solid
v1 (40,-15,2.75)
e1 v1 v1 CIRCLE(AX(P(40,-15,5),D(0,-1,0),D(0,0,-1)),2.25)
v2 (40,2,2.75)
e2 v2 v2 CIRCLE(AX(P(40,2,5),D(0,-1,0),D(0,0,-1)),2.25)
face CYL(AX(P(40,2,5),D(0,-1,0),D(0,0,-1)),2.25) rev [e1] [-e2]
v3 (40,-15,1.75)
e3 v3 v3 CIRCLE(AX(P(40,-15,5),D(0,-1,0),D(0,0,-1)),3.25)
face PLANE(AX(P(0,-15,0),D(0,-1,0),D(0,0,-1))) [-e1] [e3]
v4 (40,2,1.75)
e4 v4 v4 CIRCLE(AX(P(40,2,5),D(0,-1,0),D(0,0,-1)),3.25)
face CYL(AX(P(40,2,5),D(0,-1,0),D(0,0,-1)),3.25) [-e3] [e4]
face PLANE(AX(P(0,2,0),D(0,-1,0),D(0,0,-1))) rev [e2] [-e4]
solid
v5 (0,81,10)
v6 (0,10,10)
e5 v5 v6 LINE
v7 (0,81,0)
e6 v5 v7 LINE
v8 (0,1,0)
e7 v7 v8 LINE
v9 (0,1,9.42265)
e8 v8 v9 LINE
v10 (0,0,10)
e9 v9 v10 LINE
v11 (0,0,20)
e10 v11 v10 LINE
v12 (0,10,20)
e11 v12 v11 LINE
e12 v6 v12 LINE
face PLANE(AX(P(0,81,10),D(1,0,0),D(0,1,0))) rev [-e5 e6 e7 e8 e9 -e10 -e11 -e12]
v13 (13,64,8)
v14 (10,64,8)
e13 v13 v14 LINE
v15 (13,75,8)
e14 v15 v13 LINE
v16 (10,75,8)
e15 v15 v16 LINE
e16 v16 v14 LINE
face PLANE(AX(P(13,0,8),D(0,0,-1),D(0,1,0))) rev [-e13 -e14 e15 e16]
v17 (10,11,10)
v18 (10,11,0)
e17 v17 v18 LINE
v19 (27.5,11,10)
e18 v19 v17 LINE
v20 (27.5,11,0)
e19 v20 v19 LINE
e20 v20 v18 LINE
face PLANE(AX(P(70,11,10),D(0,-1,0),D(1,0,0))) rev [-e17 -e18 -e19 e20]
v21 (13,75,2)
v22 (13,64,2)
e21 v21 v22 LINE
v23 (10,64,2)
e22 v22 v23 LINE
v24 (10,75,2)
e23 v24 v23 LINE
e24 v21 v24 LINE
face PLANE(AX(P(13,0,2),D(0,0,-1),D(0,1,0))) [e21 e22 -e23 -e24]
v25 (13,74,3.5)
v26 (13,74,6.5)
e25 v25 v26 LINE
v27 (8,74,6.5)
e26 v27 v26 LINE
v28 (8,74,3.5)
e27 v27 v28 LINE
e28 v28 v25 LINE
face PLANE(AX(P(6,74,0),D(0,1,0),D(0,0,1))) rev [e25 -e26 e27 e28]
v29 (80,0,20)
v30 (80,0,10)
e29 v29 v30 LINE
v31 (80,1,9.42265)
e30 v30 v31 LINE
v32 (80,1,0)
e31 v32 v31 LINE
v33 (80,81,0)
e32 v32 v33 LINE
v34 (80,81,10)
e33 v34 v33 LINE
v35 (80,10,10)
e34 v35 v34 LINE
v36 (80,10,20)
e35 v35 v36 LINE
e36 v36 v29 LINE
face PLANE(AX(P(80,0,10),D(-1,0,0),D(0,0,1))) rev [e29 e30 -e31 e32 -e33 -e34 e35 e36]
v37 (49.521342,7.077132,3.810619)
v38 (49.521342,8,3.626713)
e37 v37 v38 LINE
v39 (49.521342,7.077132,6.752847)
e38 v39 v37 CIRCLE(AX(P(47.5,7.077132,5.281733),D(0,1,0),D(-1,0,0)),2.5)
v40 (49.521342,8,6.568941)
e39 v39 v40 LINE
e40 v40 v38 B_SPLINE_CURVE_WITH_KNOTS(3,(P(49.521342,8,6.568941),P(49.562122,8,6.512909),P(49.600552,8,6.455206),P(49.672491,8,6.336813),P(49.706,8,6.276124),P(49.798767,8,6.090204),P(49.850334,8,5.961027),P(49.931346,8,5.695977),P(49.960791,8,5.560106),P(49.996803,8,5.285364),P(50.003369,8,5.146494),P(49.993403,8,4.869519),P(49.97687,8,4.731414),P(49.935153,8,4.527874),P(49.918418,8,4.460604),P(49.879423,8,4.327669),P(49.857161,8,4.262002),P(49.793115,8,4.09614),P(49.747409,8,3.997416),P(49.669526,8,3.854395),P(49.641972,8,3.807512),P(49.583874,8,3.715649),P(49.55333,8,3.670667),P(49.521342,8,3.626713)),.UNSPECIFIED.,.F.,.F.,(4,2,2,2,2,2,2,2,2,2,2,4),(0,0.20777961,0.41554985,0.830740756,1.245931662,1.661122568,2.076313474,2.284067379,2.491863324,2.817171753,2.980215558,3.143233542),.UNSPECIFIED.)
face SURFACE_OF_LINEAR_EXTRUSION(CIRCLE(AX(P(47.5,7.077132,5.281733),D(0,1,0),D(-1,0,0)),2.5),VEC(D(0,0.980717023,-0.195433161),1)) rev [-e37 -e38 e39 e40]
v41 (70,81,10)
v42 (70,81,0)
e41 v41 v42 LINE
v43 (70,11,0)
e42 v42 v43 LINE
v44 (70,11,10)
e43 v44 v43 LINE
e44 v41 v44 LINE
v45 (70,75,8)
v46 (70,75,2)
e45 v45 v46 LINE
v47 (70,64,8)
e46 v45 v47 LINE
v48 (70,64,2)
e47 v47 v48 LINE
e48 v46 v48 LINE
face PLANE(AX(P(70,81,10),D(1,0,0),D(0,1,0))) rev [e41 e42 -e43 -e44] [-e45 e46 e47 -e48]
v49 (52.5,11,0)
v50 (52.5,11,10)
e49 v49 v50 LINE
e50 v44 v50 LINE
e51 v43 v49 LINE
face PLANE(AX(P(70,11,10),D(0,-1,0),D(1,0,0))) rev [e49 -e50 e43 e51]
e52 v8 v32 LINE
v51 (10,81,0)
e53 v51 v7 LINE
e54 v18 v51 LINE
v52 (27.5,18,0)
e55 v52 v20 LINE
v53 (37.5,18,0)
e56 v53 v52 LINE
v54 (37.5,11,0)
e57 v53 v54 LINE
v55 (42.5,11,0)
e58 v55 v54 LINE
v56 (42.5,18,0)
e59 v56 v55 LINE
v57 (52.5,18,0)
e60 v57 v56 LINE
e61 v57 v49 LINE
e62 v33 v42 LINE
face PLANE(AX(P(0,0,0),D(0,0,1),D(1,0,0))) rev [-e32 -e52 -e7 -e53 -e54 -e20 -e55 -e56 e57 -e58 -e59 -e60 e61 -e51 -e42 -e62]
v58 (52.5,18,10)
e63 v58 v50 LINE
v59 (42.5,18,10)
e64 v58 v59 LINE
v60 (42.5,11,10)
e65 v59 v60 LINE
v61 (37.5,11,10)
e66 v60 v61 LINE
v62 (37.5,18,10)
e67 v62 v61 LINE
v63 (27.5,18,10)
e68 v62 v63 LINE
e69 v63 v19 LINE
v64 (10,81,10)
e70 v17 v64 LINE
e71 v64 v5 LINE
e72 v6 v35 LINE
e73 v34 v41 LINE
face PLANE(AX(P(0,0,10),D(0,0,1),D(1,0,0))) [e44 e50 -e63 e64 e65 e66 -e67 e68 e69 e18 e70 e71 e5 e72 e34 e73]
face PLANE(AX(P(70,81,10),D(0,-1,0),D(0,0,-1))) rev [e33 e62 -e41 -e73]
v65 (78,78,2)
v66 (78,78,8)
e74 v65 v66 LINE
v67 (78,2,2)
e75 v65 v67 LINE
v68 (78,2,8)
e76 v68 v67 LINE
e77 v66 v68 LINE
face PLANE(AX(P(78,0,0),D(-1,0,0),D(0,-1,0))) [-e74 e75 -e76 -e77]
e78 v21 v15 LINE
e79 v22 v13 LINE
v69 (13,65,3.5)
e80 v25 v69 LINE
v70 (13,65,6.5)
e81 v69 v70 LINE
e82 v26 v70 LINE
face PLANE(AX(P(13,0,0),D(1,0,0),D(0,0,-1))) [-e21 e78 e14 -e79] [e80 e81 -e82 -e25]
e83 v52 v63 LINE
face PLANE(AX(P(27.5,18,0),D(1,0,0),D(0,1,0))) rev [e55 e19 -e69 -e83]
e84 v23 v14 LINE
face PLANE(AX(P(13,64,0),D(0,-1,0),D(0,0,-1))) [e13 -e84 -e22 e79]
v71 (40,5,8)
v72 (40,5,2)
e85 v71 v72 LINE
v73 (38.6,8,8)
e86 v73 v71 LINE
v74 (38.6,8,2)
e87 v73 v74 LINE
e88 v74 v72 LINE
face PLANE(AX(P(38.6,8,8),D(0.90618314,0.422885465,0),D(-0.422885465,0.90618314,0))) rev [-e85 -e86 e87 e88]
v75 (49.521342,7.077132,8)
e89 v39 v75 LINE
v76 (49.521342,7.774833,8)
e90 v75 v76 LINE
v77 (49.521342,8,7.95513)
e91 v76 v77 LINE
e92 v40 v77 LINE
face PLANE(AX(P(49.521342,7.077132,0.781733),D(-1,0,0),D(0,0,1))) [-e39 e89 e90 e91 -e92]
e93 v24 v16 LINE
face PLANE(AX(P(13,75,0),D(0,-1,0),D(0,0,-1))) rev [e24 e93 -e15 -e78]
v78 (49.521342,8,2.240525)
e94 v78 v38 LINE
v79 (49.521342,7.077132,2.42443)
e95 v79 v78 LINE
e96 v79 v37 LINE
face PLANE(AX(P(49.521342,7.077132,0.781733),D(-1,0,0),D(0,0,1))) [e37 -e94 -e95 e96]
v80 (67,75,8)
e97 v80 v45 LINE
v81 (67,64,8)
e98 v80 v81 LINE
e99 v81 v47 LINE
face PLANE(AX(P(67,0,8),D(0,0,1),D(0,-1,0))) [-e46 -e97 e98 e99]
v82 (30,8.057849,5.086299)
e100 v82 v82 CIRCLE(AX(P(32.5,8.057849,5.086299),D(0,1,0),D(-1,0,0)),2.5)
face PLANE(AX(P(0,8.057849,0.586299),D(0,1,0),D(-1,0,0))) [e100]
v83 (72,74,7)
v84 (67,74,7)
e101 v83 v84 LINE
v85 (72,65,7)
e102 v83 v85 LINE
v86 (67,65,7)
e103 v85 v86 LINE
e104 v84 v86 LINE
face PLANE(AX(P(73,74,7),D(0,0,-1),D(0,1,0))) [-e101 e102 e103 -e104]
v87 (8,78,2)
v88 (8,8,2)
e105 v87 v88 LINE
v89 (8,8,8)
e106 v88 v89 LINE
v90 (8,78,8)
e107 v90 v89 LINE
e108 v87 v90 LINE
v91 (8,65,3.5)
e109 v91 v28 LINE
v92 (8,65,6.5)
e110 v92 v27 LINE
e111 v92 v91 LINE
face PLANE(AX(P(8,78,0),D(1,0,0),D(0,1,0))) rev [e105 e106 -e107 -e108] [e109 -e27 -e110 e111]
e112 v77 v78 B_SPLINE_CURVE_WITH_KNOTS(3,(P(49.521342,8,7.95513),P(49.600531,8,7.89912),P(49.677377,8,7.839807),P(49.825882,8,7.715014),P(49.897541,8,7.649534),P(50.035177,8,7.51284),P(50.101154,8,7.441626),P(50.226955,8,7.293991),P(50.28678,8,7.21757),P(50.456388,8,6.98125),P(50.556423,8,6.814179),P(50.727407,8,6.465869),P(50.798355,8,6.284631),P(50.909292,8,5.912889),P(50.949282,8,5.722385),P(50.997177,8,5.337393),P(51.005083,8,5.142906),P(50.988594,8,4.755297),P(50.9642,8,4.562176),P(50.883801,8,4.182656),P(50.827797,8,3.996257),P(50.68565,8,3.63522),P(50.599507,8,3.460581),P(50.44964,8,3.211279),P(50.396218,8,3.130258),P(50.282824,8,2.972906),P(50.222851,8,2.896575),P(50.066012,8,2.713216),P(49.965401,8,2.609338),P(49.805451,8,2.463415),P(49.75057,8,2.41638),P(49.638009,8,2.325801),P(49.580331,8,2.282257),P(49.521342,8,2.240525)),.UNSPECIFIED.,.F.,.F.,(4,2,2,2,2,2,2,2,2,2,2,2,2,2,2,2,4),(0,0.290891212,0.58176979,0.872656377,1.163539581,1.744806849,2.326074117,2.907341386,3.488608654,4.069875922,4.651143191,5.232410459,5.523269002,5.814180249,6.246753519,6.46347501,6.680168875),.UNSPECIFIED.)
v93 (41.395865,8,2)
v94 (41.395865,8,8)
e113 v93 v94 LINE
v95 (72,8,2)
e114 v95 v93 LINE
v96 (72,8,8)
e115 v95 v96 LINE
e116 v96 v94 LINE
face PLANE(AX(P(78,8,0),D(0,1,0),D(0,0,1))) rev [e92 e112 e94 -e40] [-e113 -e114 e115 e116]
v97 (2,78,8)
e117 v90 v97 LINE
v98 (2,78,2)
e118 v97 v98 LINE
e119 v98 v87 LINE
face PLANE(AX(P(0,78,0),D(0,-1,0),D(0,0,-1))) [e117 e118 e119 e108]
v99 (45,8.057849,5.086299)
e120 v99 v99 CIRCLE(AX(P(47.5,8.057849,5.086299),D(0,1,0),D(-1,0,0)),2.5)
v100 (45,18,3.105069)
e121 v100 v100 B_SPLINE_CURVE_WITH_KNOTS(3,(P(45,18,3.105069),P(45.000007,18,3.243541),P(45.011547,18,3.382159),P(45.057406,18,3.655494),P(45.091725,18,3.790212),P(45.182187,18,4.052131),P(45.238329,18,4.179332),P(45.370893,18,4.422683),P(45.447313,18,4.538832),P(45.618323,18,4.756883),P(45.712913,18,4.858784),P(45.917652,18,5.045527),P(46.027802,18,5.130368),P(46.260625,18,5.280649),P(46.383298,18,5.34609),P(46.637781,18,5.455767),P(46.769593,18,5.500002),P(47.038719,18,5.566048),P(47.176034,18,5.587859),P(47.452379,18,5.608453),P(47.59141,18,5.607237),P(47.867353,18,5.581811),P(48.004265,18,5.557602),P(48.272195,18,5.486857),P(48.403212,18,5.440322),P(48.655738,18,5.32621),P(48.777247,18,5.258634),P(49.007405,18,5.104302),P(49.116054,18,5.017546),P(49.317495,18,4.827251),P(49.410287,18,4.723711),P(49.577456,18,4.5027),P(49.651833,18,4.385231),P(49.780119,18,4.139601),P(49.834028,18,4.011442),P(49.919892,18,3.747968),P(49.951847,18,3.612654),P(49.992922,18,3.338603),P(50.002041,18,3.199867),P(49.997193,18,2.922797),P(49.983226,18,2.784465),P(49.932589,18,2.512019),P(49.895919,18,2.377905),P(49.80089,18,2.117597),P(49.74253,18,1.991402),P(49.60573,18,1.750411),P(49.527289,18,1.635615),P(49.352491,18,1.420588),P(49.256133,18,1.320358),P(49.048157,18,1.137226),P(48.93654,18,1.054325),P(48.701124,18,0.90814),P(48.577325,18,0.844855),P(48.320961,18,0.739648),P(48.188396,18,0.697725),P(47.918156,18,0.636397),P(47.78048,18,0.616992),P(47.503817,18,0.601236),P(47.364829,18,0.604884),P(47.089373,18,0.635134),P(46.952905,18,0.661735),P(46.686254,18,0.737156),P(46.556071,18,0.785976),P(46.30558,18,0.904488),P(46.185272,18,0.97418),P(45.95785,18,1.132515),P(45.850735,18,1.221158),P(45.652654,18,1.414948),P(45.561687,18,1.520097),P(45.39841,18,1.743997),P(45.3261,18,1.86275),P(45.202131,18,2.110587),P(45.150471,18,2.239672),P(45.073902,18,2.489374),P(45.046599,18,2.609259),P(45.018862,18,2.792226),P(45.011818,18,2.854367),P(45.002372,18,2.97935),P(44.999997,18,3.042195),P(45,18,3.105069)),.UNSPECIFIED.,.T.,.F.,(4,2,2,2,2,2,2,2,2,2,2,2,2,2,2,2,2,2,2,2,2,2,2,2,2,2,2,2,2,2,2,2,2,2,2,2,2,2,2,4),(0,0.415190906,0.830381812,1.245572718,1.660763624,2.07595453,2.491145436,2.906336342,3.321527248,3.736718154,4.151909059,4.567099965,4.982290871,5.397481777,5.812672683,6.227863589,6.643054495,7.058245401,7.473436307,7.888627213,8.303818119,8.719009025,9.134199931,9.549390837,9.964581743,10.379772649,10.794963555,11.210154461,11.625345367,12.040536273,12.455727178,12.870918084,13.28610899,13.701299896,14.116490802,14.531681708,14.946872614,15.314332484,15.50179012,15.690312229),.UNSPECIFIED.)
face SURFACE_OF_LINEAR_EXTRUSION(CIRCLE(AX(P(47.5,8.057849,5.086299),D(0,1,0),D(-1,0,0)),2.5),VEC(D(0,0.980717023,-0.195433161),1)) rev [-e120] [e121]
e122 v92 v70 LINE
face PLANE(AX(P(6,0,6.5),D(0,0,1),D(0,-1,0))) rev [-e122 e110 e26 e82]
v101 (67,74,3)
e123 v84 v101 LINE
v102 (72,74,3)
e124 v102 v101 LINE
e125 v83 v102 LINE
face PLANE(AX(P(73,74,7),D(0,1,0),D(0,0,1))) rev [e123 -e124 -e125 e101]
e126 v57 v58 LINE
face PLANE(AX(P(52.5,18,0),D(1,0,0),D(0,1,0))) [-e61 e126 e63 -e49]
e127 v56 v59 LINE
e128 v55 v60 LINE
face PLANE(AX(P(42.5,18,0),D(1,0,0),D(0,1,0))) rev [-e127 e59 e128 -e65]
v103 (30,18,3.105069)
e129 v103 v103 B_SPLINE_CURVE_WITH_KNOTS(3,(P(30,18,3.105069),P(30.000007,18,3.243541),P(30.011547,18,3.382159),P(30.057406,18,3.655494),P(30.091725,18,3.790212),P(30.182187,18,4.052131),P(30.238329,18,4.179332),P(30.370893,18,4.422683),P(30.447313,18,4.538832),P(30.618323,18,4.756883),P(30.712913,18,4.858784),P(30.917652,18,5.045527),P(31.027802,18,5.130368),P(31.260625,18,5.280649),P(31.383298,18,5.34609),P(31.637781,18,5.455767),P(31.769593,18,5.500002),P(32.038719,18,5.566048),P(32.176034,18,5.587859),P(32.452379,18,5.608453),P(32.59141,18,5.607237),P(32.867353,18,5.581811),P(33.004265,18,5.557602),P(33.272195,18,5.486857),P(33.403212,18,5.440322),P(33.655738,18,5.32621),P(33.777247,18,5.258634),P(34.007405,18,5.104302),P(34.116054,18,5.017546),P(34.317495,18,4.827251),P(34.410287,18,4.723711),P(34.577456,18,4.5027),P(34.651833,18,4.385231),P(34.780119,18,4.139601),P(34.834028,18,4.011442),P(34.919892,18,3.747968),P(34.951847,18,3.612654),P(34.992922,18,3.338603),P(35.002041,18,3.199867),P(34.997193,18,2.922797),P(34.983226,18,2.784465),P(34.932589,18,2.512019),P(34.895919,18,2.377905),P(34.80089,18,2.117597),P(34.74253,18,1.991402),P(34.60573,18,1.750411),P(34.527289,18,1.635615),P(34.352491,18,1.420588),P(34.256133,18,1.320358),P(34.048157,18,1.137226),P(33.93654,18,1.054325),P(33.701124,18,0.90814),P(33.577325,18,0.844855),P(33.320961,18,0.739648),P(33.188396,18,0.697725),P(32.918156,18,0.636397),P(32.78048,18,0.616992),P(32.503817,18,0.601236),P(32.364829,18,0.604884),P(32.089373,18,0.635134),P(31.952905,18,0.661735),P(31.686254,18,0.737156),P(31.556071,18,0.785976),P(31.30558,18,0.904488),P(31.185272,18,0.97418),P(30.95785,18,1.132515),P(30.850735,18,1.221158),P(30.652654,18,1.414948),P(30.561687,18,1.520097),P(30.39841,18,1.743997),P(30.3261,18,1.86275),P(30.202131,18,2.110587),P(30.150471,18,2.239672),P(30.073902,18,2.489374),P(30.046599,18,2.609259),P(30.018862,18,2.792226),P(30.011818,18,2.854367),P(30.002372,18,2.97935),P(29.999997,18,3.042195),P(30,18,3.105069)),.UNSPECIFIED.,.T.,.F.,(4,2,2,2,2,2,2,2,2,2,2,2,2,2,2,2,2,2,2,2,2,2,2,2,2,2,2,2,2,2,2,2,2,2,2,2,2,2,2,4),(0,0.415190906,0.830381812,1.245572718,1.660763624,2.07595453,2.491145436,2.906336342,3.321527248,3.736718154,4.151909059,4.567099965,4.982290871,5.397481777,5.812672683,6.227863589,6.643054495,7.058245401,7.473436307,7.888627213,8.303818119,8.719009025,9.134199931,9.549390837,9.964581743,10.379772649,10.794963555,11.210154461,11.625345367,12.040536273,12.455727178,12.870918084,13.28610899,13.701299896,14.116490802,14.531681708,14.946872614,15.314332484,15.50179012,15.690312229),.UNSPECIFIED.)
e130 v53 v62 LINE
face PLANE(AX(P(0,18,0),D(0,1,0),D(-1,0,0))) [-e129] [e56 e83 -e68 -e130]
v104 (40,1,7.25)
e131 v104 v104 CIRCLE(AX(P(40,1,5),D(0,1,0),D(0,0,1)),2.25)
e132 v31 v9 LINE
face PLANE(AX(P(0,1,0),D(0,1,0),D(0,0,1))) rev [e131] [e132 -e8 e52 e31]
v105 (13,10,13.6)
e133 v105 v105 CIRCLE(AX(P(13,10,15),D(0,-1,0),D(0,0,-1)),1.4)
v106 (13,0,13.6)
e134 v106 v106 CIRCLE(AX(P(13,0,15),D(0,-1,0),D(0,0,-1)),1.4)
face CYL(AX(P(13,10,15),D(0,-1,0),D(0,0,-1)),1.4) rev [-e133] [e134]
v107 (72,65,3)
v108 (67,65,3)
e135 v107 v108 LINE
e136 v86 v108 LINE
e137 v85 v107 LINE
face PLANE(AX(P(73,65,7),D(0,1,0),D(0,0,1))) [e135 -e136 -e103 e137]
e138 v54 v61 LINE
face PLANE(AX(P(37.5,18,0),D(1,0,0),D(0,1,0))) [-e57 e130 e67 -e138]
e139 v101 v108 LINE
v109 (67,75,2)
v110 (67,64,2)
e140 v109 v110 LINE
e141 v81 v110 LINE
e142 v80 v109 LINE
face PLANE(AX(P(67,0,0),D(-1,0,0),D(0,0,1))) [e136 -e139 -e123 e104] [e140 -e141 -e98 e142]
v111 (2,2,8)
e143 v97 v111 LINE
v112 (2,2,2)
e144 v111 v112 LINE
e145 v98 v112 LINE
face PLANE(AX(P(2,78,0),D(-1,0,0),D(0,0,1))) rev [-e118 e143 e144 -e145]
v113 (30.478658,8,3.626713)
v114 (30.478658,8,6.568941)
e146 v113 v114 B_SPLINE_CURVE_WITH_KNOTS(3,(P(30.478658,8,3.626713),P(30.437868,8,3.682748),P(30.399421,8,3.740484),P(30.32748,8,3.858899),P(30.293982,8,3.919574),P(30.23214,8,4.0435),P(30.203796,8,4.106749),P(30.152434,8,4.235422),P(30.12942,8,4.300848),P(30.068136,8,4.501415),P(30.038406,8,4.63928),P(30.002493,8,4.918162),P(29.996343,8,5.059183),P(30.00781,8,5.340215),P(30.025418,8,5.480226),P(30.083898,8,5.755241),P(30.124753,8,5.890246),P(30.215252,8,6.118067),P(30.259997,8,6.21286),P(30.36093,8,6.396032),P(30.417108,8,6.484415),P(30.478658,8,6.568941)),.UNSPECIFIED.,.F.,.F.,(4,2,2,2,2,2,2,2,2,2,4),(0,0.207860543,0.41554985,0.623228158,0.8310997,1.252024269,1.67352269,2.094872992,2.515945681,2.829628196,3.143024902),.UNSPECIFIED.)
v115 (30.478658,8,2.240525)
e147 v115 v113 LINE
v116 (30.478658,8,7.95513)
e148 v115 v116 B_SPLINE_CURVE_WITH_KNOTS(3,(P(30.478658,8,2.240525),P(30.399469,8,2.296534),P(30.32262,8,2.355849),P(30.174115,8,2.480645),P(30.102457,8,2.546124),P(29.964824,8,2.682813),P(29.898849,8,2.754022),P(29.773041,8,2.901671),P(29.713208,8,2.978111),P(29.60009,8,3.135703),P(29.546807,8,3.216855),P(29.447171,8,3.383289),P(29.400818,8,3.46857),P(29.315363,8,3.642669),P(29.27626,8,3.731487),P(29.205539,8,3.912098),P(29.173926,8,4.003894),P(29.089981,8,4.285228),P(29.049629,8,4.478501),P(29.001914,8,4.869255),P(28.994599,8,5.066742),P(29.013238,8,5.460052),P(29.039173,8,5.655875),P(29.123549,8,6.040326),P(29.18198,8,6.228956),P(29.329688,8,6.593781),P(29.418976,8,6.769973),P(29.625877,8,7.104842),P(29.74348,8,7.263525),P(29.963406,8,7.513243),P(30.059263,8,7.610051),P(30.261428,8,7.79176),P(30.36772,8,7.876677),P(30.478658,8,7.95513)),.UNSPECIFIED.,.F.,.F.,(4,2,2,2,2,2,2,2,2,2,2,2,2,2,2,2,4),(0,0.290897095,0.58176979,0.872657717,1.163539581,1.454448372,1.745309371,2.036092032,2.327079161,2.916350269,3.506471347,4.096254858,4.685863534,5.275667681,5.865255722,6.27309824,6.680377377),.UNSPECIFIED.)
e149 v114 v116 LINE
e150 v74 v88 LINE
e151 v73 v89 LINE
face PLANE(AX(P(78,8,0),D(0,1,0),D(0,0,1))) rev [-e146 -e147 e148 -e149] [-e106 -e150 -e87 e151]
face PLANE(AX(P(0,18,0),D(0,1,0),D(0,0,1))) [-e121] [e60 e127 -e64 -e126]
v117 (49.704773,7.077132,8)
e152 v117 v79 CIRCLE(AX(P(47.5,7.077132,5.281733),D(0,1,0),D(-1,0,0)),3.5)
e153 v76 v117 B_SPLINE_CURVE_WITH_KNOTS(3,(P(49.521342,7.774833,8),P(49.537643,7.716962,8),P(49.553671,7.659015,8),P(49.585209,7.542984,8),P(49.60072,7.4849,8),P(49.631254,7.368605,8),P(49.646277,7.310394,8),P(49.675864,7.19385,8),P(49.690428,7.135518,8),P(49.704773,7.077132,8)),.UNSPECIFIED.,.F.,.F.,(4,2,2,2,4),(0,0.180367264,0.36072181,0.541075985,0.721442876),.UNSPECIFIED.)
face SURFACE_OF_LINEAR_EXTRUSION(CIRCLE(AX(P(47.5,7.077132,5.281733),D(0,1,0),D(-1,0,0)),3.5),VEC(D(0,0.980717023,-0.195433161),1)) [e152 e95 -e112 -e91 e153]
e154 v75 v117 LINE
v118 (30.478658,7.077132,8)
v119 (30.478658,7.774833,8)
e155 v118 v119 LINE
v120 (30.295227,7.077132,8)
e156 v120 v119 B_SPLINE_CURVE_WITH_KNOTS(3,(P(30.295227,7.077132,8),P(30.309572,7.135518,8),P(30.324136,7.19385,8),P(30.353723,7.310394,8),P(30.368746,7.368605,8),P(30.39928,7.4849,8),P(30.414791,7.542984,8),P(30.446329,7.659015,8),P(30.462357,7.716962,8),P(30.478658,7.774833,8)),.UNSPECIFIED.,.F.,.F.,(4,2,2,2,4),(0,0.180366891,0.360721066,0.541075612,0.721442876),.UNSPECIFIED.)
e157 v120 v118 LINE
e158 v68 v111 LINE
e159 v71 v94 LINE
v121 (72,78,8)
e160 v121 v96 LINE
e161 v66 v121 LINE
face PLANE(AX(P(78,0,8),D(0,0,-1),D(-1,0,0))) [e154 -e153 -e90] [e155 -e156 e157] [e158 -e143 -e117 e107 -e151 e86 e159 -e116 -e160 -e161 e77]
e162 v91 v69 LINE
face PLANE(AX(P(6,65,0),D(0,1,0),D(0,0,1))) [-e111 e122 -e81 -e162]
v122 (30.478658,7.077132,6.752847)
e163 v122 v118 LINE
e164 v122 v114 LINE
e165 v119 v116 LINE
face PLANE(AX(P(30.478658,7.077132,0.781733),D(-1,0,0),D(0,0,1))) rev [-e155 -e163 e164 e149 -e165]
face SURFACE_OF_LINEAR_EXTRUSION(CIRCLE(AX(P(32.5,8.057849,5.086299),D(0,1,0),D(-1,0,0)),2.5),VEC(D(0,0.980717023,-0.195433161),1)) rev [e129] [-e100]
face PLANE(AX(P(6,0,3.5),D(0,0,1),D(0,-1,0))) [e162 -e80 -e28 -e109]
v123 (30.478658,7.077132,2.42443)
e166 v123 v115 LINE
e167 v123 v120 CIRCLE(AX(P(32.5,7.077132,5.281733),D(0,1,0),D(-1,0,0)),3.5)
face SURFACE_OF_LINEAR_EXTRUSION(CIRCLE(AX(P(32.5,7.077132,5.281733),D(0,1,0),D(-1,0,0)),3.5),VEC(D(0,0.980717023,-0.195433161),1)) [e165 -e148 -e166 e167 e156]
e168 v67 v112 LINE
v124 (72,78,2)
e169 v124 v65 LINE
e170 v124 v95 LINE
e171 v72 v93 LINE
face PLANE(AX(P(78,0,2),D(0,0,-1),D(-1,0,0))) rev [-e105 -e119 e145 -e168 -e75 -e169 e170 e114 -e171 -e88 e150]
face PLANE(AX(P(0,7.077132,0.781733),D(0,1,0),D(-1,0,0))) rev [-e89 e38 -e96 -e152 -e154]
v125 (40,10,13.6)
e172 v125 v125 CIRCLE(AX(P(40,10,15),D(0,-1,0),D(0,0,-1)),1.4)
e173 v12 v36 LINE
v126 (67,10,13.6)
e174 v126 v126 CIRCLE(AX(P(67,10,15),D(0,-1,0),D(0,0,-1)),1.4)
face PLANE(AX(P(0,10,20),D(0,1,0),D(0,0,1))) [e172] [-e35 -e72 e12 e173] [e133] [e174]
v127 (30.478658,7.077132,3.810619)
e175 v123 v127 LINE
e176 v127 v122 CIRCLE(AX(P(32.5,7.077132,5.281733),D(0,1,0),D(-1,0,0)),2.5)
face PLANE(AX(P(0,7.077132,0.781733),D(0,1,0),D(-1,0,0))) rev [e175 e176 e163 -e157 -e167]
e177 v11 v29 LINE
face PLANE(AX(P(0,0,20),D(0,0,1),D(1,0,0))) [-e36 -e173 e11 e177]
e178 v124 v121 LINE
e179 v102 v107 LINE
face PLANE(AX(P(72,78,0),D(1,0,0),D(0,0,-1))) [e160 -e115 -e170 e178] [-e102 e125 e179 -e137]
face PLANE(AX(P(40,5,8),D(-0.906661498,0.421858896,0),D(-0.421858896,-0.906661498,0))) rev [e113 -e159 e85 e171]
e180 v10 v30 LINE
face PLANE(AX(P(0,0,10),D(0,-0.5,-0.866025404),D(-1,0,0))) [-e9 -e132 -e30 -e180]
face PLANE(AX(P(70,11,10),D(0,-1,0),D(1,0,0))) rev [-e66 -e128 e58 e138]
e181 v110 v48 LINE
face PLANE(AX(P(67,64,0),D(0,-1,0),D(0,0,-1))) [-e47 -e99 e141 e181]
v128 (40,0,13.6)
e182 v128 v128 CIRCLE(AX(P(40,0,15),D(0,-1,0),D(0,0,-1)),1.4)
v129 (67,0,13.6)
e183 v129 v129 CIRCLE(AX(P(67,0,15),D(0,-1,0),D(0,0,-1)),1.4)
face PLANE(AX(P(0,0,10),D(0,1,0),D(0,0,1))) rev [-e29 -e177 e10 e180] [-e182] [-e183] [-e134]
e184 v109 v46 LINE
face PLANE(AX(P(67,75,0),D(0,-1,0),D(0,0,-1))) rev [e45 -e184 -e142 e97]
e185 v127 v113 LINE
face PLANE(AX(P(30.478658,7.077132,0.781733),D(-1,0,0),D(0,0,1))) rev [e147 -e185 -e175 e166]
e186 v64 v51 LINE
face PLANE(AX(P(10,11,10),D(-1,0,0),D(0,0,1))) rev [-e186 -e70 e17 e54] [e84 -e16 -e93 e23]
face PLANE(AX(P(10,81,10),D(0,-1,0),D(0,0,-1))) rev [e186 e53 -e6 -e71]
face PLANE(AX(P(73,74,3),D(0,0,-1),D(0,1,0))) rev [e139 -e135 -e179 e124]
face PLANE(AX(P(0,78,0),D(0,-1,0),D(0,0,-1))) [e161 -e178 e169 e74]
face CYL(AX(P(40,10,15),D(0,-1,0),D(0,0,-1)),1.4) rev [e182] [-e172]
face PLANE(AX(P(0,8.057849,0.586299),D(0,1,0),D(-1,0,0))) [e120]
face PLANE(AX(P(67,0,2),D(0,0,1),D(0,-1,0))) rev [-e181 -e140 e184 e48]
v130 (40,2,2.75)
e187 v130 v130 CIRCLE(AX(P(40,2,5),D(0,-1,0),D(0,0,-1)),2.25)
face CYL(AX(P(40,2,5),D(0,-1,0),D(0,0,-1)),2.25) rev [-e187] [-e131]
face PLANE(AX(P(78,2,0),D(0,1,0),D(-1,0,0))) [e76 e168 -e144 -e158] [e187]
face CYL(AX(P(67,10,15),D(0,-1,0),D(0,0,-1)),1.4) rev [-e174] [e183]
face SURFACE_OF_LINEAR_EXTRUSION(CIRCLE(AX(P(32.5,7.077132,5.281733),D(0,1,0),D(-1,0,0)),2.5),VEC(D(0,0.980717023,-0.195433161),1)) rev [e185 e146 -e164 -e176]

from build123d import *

# Parameters (mm, degrees)
BOSS_EXTRUDE1_DEPTH       = 10
SKETCH6_W                 = 4
SKETCH6_H                 = 9
CUT_EXTRUDE3_DEPTH        = 3
SKETCH6_3_W               = 6
SKETCH6_3_H               = 11
SKETCH6_3_W_2             = 4
SKETCH6_3_H_2             = 9
BOSS_EXTRUDE4_DEPTH       = 3
CUT_EXTRUDE4_START        = 65
CUT_EXTRUDE4_OUTLINE_W    = 4
CUT_EXTRUDE4_OUTLINE_H    = 3
CUT_EXTRUDE4_DEPTH        = 9
SKETCH5_3_W               = 6
SKETCH5_3_H               = 11
SKETCH5_3_W_2             = 3
SKETCH5_3_H_2             = 9
BOSS_EXTRUDE5_DEPTH       = 3
SKETCH8_W                 = 10
SKETCH8_H                 = 10
BOSS_EXTRUDE8_DEPTH       = 80
SKETCH9_R                 = 1.4
CUT_EXTRUDE6_DEPTH        = 10
SKETCH4_W                 = 10
SKETCH4_H                 = 10
BOSS_EXTRUDE11_DEPTH      = 7
SKETCH4_15_R              = 2.5
CUT_EXTRUDE8_DEPTH        = 8
CUT_EXTRUDE8_DEPTH_BACK   = 3
CUT_EXTRUDE11_DEPTH       = 78
SKETCH17_W                = 6
SKETCH17_H                = 6
CUT_EXTRUDE12_DEPTH       = 70
BOSS_EXTRUDE20_DEPTH      = 2
BOSS_EXTRUDE22_DEPTH      = 2
BOSS_EXTRUDE23_DEPTH      = 6
SKETCH22_W                = 10
SKETCH22_H                = 1
CUT_EXTRUDE15_DEPTH       = 80
CHAMFER3_SIZE2            = 0.577350269
CHAMFER3_SIZE             = 1
BOSS_EXTRUDE25_DEPTH      = 15
BOSS_EXTRUDE25_DEPTH_BACK = 2
CUT_EXTRUDE16_DEPTH       = 2
BOSS_EXTRUDE26_DEPTH      = 4


# Read off the part's stored shape, not the designer's step: Cut-Extrude4
with BuildPart() as part:
    # Sketch1 → Boss-Extrude1 (new body)
    with BuildSketch(Plane.XY):
        Polygon((0, 0), (80, 0), (80, 81), (70, 81), (70, 11), (10, 11), (10, 81), (0, 81), align=None)
    extrude(amount=BOSS_EXTRUDE1_DEPTH)

    # Sketch6 → Cut-Extrude3 (cut)
    with BuildSketch(Plane.ZY.offset(-70)):
        with Locations((5, 69.5)):
            Rectangle(SKETCH6_W, SKETCH6_H)
    extrude(amount=-CUT_EXTRUDE3_DEPTH, mode=Mode.SUBTRACT)

    # Sketch6<3> → Boss-Extrude4 (add)
    with BuildSketch(Plane.ZY.offset(-70)):
        with Locations((5, 69.5)):
            Rectangle(SKETCH6_3_W, SKETCH6_3_H)
        with Locations((5, 69.5)):
            Rectangle(SKETCH6_3_W_2, SKETCH6_3_H_2, mode=Mode.SUBTRACT)
    extrude(amount=BOSS_EXTRUDE4_DEPTH)

    # Cut-Extrude4 outline → Cut-Extrude4 (cut)
    with BuildSketch(Plane(origin=(0, 0, 0), x_dir=(1, 0, 0), z_dir=(0, 1, 0)).offset(CUT_EXTRUDE4_START)):
        with Locations((8, -5)):
            Rectangle(CUT_EXTRUDE4_OUTLINE_W, CUT_EXTRUDE4_OUTLINE_H)
    extrude(amount=CUT_EXTRUDE4_DEPTH, mode=Mode.SUBTRACT)

    # Sketch5<3> → Boss-Extrude5 (add)
    with BuildSketch(Plane(origin=(10, 0, 0), x_dir=(0, 0, -1), z_dir=(1, 0, 0))):
        with Locations((-5, 69.5)):
            Rectangle(SKETCH5_3_W, SKETCH5_3_H)
        with Locations((-5, 69.5)):
            Rectangle(SKETCH5_3_W_2, SKETCH5_3_H_2, mode=Mode.SUBTRACT)
    extrude(amount=BOSS_EXTRUDE5_DEPTH)

    # Sketch8 → Boss-Extrude8 (add)
    with BuildSketch(Plane(origin=(80, 0, 0), x_dir=(0, 0, -1), z_dir=(1, 0, 0))):
        with Locations((-15, 5)):
            Rectangle(SKETCH8_W, SKETCH8_H)
    extrude(amount=-BOSS_EXTRUDE8_DEPTH)

    # Sketch9 → Cut-Extrude6 (cut)
    with BuildSketch(Plane.XZ):
        with Locations(Location((40, 15, 0), (0, 0, 270))):
            Circle(SKETCH9_R)
        with Locations(Location((13, 15, 0), (0, 0, 270))):
            Circle(SKETCH9_R)
        with Locations(Location((67, 15, 0), (0, 0, 270))):
            Circle(SKETCH9_R)
    extrude(amount=-CUT_EXTRUDE6_DEPTH, mode=Mode.SUBTRACT)

    # Sketch4 → Boss-Extrude11 (add)
    with BuildSketch(Plane(origin=(0, 11, 0), x_dir=(1, 0, 0), z_dir=(0, 1, 0))):
        with Locations((32.5, -5)):
            Rectangle(SKETCH4_W, SKETCH4_H)
        with Locations((47.5, -5)):
            Rectangle(SKETCH4_W, SKETCH4_H)
    extrude(amount=BOSS_EXTRUDE11_DEPTH)

    # Sketch4<15> → Cut-Extrude8 (cut, two sides, along a direction that is not the sketch's normal)
    with BuildSketch(Plane(origin=(0, 11, 0), x_dir=(1, 0, 0), z_dir=(0, 1, 0))) as cut_extrude8_sk:
        with Locations((32.5, -4.5)):
            Circle(SKETCH4_15_R)
        with Locations((47.5, -4.5)):
            Circle(SKETCH4_15_R)
    extrude(amount=CUT_EXTRUDE8_DEPTH, dir=(0, 0.9807170231588296, -0.19543316117405435), mode=Mode.SUBTRACT)
    extrude(cut_extrude8_sk.sketch, amount=-CUT_EXTRUDE8_DEPTH_BACK, dir=(0, 0.9807170231588296, -0.19543316117405435), mode=Mode.SUBTRACT)

    # Sketch2 → Cut-Extrude11 (cut)
    with BuildSketch(Plane.ZY):
        with BuildLine():
            Line((8, 8), (5, 8))
            ThreePointArc((5, 8), (7.121320344, 7.121320344), (8, 5))
            Line((8, 5), (8, 8))
        make_face()
        with BuildLine():
            Line((8, 2), (8, 5))
            ThreePointArc((8, 5), (7.121320344, 2.878679656), (5, 2))
            Line((5, 2), (8, 2))
        make_face()
        with BuildLine():
            ThreePointArc((5, 2), (2.878679656, 2.878679656), (2, 5))
            Line((2, 5), (2, 2))
            Line((2, 2), (5, 2))
        make_face()
        with BuildLine():
            ThreePointArc((2, 5), (2.878679656, 7.121320344), (5, 8))
            Line((5, 8), (2, 8))
            Line((2, 8), (2, 5))
        make_face()
        with BuildLine():
            ThreePointArc((8, 5), (7.121320344, 7.121320344), (5, 8))
            Line((5, 8), (5, 7))
            ThreePointArc((5, 7), (6.414213562, 6.414213562), (7, 5))
            ThreePointArc((7, 5), (6.414213562, 3.585786438), (5, 3))
            Line((5, 3), (5, 2))
            ThreePointArc((5, 2), (7.121320344, 2.878679656), (8, 5))
        make_face()
        with BuildLine():
            Line((5, 7), (5, 8))
            ThreePointArc((5, 8), (2.878679656, 7.121320344), (2, 5))
            ThreePointArc((2, 5), (2.878679656, 2.878679656), (5, 2))
            Line((5, 2), (5, 3))
            ThreePointArc((5, 3), (3, 5), (5, 7))
        make_face()
        with BuildLine():
            ThreePointArc((7, 5), (6.414213562, 6.414213562), (5, 7))
            Line((5, 7), (5, 3))
            ThreePointArc((5, 3), (6.414213562, 3.585786438), (7, 5))
        make_face()
        with BuildLine():
            Line((5, 3), (5, 7))
            ThreePointArc((5, 7), (3, 5), (5, 3))
        make_face()
    extrude(amount=-CUT_EXTRUDE11_DEPTH, mode=Mode.SUBTRACT)

    # Sketch17 → Cut-Extrude12 (cut)
    with BuildSketch(Plane.XZ.offset(-8)):
        with Locations((5, 5)):
            Rectangle(SKETCH17_W, SKETCH17_H)
        with Locations((75, 5)):
            Rectangle(SKETCH17_W, SKETCH17_H)
    extrude(amount=-CUT_EXTRUDE12_DEPTH, mode=Mode.SUBTRACT)

    # Sketch2<17> → Boss-Extrude20 (add)
    with BuildSketch(Plane.ZY):
        with BuildLine():
            ThreePointArc((2, 5), (2.878679656, 7.121320344), (5, 8))
            Line((5, 8), (2, 8))
            Line((2, 8), (2, 5))
        make_face()
        with BuildLine():
            Line((8, 8), (5, 8))
            ThreePointArc((5, 8), (7.121320344, 7.121320344), (8, 5))
            Line((8, 5), (8, 8))
        make_face()
        with BuildLine():
            Line((8, 2), (8, 5))
            ThreePointArc((8, 5), (7.121320344, 2.878679656), (5, 2))
            Line((5, 2), (8, 2))
        make_face()
        with BuildLine():
            ThreePointArc((5, 2), (2.878679656, 2.878679656), (2, 5))
            Line((2, 5), (2, 2))
            Line((2, 2), (5, 2))
        make_face()
    extrude(amount=-BOSS_EXTRUDE20_DEPTH)

    # Sketch2<18> → Boss-Extrude22 (add)
    with BuildSketch(Plane.ZY):
        with BuildLine():
            ThreePointArc((8, 5), (7.121320344, 7.121320344), (5, 8))
            Line((5, 8), (5, 7))
            ThreePointArc((5, 7), (6.414213562, 6.414213562), (7, 5))
            ThreePointArc((7, 5), (6.414213562, 3.585786438), (5, 3))
            Line((5, 3), (5, 2))
            ThreePointArc((5, 2), (7.121320344, 2.878679656), (8, 5))
        make_face()
        with BuildLine():
            Line((5, 7), (5, 8))
            ThreePointArc((5, 8), (2.878679656, 7.121320344), (2, 5))
            ThreePointArc((2, 5), (2.878679656, 2.878679656), (5, 2))
            Line((5, 2), (5, 3))
            ThreePointArc((5, 3), (3, 5), (5, 7))
        make_face()
        with BuildLine():
            ThreePointArc((7, 5), (6.414213562, 6.414213562), (5, 7))
            Line((5, 7), (5, 3))
            ThreePointArc((5, 3), (6.414213562, 3.585786438), (7, 5))
        make_face()
        with BuildLine():
            Line((5, 3), (5, 7))
            ThreePointArc((5, 7), (3, 5), (5, 3))
        make_face()
    extrude(amount=-BOSS_EXTRUDE22_DEPTH)

    # Sketch21 → Boss-Extrude23 (add)
    with BuildSketch(Plane.XY.offset(2)):
        Polygon((41.4, 8.008887831), (38.6, 8), (40, 5), align=None)
    extrude(amount=BOSS_EXTRUDE23_DEPTH)

    # Sketch22 → Cut-Extrude15 (cut)
    with BuildSketch(Plane(origin=(80, 0, 0), x_dir=(0, 0, -1), z_dir=(1, 0, 0))):
        with Locations((-5, 0.5)):
            Rectangle(SKETCH22_W, SKETCH22_H)
    extrude(amount=-CUT_EXTRUDE15_DEPTH, mode=Mode.SUBTRACT)

    # Chamfer3
    chamfer3_edges = [part.edges().sort_by_distance(p)[0] for p in [
        (40, 1, 10),
    ]]
    chamfer3_side = [part.faces().sort_by_distance(p)[0] for p in [
        (40, 0.988452995, 10),
    ]]
    chamfer(chamfer3_edges, length=CHAMFER3_SIZE - 0.0001, length2=CHAMFER3_SIZE2 - 0.0001, reference=chamfer3_side[0])  # a hair under: the kernel refuses the full size

    # Sketch19<5> → Cut-Extrude16 (cut)
    with BuildSketch(Plane.XZ):
        with BuildLine():
            ThreePointArc((40, 7.25), (37.75, 5), (40, 2.75))
            Line((40, 2.75), (40, 7.25))
        make_face()
        with BuildLine():
            Line((40, 7.25), (40, 2.75))
            ThreePointArc((40, 2.75), (41.590990258, 3.409009742), (42.25, 5))
            ThreePointArc((42.25, 5), (41.590990258, 6.590990258), (40, 7.25))
        make_face()
    extrude(amount=-CUT_EXTRUDE16_DEPTH, mode=Mode.SUBTRACT)

    # Sketch4<16> → Boss-Extrude26 (add, along a direction that is not the sketch's normal)
    with BuildSketch(Plane(origin=(0, 11, 0), x_dir=(1, 0, 0), z_dir=(0, 1, 0))):
        with BuildLine():
            Line((30.47865802, -3.028885933), (30.47865802, -1.642697671))
            ThreePointArc((30.47865802, -1.642697671), (29, -4.5), (30.47865802, -7.357302329))
            Line((30.47865802, -7.357302329), (30.47865802, -5.971114067))
            ThreePointArc((30.47865802, -5.971114067), (30, -4.5), (30.47865802, -3.028885933))
        make_face()
        with BuildLine():
            ThreePointArc((49.52134198, -7.357302329), (51, -4.5), (49.52134198, -1.642697671))
            Line((49.52134198, -1.642697671), (49.52134198, -3.028885933))
            ThreePointArc((49.52134198, -3.028885933), (50, -4.5), (49.52134198, -5.971114067))
            Line((49.52134198, -5.971114067), (49.52134198, -7.357302329))
        make_face()
    extrude(amount=-BOSS_EXTRUDE26_DEPTH, dir=(0, 0.9807170231588296, -0.19543316117405435))


with BuildPart() as body_2:
    # Sketch19 → Boss-Extrude25 (new, two sides: drawn at the far end of the back side and taken through both)
    with BuildSketch(Plane.XZ.offset(-BOSS_EXTRUDE25_DEPTH_BACK)):
        with BuildLine():
            ThreePointArc((40, 8.25), (36.75, 5), (40, 1.75))
            Line((40, 1.75), (40, 2.75))
            ThreePointArc((40, 2.75), (37.75, 5), (40, 7.25))
            Line((40, 7.25), (40, 8.25))
        make_face()
        with BuildLine():
            Line((40, 2.75), (40, 1.75))
            ThreePointArc((40, 1.75), (42.298097039, 2.701902961), (43.25, 5))
            ThreePointArc((43.25, 5), (42.298097039, 7.298097039), (40, 8.25))
            Line((40, 8.25), (40, 7.25))
            ThreePointArc((40, 7.25), (41.590990258, 6.590990258), (42.25, 5))
            ThreePointArc((42.25, 5), (41.590990258, 3.409009742), (40, 2.75))
        make_face()
    extrude(amount=BOSS_EXTRUDE25_DEPTH + BOSS_EXTRUDE25_DEPTH_BACK)


solid = Compound([part.part, body_2.part])
